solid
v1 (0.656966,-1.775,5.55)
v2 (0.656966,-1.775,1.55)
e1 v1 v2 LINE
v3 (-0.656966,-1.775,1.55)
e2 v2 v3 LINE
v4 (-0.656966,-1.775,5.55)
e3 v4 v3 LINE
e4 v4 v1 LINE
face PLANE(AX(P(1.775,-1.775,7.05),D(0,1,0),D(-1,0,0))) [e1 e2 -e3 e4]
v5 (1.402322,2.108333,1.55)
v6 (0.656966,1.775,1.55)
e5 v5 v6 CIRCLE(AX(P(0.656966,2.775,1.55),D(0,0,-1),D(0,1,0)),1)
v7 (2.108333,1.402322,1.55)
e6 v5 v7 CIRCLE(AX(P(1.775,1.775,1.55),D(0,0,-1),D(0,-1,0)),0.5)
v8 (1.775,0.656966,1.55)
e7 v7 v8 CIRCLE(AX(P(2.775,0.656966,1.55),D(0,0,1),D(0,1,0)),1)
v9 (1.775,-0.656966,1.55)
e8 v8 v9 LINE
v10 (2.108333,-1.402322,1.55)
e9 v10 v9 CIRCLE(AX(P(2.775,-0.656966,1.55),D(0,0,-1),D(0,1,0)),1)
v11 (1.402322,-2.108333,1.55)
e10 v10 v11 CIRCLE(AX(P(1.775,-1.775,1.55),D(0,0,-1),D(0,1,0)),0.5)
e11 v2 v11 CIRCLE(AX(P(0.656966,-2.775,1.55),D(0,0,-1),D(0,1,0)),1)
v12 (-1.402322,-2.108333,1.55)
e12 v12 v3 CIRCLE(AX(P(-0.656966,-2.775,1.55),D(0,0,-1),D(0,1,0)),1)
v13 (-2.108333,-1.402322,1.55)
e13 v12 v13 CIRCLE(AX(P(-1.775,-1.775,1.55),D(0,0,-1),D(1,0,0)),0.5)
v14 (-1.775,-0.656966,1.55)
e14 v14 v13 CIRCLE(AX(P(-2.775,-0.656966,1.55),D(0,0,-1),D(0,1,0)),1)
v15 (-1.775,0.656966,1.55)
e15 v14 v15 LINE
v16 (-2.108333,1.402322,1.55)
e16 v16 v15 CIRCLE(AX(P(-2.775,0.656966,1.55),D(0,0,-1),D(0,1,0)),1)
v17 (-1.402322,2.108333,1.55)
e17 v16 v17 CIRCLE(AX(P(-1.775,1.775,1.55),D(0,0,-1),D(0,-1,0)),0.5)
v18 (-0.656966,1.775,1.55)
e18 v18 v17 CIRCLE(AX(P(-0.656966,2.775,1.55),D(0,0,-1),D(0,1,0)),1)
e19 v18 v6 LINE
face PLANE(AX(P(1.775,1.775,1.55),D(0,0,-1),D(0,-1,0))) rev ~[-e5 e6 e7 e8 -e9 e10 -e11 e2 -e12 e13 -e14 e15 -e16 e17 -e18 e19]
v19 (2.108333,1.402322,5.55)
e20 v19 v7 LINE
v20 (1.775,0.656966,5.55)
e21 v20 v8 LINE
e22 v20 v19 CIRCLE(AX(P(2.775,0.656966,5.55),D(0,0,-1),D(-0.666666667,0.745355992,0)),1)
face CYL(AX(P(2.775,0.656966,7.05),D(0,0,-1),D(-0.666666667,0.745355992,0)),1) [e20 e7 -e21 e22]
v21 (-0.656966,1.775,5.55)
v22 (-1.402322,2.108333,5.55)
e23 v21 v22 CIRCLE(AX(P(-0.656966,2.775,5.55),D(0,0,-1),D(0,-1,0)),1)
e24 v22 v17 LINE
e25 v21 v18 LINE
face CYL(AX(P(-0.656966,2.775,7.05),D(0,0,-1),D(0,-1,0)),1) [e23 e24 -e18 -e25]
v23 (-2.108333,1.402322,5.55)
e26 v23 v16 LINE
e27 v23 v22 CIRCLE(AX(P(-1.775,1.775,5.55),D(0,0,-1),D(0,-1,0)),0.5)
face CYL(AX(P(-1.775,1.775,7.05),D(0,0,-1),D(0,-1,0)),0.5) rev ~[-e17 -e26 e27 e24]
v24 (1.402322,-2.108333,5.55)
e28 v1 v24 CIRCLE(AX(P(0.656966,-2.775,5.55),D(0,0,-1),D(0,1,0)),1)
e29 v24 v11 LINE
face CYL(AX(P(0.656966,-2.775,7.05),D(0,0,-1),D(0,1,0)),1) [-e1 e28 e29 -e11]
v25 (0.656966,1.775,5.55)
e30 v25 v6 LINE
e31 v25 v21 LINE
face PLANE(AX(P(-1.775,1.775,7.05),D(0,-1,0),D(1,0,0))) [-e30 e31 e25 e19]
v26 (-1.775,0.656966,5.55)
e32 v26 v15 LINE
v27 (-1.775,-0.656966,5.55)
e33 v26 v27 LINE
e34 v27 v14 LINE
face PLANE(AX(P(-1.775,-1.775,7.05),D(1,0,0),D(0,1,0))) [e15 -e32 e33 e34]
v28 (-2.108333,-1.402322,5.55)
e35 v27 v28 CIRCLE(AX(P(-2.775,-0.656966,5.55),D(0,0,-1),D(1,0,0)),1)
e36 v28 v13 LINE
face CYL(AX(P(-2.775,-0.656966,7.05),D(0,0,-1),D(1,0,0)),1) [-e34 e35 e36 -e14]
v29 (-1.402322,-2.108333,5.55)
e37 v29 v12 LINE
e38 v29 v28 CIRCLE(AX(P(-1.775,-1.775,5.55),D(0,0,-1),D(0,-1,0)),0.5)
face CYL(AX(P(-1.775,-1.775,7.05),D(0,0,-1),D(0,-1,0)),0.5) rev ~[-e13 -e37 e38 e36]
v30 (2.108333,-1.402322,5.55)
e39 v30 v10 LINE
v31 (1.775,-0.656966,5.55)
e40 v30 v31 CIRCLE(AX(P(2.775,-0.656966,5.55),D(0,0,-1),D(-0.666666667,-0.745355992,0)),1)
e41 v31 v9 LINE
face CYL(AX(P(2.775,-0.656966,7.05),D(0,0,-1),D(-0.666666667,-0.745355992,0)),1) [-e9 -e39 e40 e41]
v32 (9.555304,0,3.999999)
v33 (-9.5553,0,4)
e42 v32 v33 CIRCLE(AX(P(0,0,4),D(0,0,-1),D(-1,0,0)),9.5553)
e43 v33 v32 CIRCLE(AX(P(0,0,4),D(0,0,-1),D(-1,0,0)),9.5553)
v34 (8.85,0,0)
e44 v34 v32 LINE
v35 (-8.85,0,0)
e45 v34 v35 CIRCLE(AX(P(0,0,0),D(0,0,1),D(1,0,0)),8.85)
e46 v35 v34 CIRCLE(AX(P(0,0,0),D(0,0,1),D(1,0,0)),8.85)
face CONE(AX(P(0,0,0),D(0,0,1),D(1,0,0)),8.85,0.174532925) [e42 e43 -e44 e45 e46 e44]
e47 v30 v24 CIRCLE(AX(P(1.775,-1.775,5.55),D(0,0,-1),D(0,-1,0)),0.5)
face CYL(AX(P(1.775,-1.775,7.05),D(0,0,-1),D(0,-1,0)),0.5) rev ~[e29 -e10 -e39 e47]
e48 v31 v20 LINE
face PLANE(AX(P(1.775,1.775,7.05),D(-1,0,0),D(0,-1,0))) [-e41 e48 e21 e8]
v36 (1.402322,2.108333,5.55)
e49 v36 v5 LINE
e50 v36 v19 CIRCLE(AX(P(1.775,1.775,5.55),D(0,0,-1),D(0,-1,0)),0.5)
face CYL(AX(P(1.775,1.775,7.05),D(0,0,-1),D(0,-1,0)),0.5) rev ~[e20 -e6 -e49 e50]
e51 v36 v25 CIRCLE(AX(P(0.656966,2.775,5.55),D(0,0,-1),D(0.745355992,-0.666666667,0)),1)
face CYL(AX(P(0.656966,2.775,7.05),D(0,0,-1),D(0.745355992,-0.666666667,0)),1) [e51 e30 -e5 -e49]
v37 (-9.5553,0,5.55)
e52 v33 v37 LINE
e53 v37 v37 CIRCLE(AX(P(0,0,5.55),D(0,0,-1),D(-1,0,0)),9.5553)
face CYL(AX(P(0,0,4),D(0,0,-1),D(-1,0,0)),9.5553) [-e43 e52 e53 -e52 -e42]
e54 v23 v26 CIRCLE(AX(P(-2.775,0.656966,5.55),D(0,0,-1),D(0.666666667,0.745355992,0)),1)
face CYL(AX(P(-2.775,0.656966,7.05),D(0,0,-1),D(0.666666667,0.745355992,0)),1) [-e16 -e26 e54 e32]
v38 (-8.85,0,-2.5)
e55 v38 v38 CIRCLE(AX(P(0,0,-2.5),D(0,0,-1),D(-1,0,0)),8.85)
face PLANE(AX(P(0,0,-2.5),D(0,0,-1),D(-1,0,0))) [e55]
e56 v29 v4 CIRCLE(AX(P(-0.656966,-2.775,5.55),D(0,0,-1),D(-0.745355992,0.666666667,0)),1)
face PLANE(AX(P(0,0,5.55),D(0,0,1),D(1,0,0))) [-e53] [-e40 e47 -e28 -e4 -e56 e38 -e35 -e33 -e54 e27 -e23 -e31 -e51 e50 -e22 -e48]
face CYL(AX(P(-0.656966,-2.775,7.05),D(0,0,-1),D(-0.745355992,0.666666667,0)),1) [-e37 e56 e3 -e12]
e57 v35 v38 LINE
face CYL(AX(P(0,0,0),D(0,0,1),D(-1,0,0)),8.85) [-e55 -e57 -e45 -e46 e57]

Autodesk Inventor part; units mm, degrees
ref_plane "YZ Plane" through (0, 0, 0) normal (1, 0, 0) x (0, 1, 0)
ref_plane "XZ Plane" through (0, 0, 0) normal (0, 1, 0) x (-1, 0, 0)
sketch "Esquisse1" plane through (0, 0, 0) normal (0, 0, 1) x (1, 0, 0)
  circle A0 centre (0, 0) radius 8.85
  dimension "d0" = 17.7
extrude "Extrusion1" add sketch "Esquisse1" along normal blind 7.05 draft 10
sketch "Esquisse2" plane through (0, 0, 7.05) normal (0, 0, 1) x (1, 0, 0)
  line L0 (1.775, -1.775) -> (-1.775, -1.775)
  line L1 (-1.775, -1.775) -> (-1.775, 1.775)
  line L2 (-1.775, 1.775) -> (1.775, 1.775)
  line L3 (1.775, 1.775) -> (1.775, -1.775)
  line L4 (1.775, -1.775) -> (-1.775, 1.775) construction
  line L5 (-1.775, -1.775) -> (1.775, 1.775) construction
  point P0 (0, 0)
  dimension "d3" = 3.55
  dimension "d4" = 3.55
extrude "Extrusion2" cut sketch "Esquisse2" against normal blind 5.5
ref_plane "Plan de construction1" through (0, 0, 4) normal (0, 0, -1) x (-1, 0, 0)
sketch "Esquisse3" plane through (0, 0, 4) normal (0, 0, -1) x (-1, 0, 0)
  circle A0 centre (0, 0) radius 9.5553 projected
  circle A1 centre (0, 0) radius 13.8909
  line L0 (-1.775, 1.775) -> (-1.775, -1.775) projected
  line L1 (-1.775, -1.775) -> (1.775, -1.775) projected
  line L2 (1.775, -1.775) -> (1.775, 1.775) projected
  line L3 (1.775, 1.775) -> (-1.775, 1.775) projected
extrude "Extrusion3" cut sketch "Esquisse3" against normal through all contours A1
sketch "Esquisse4" plane through (0, 0, 0) normal (0, 0, -1) x (-1, 0, 0)
  circle A0 centre (0, 0) radius 8.85 projected
extrude "Extrusion4" add sketch "Esquisse4" along normal blind 2.5
sketch "Esquisse5" plane through (0, 0, -2.5) normal (0, 0, -1) x (-1, 0, 0)
  line L0 (2.6892, 4.9729) -> (2.6892, -4.9729) construction
  line L1 (2.6892, -4.9729) -> (-2.6892, -4.9729) construction
  line L2 (-2.6892, -4.9729) -> (-2.6892, 4.9729) construction
  line L3 (-2.6892, 4.9729) -> (2.6892, 4.9729) construction
  line L4 (13.3774, 0) -> (-13.3774, 0) projected
  line L5 (0, -13.3774) -> (0, 13.3774) projected
  point P0 (0, 0)
  point P1 (-3.9441, 0)
  point P2 (0, -4.9729)
  point P3 (-2.6892, 0)
  point P4 (0, -4.9729)
extrude "Extrusion5" [suppressed]
sketch "Esquisse6" plane through (0, 0, 7.05) normal (0, 0, 1) x (1, 0, 0)
  line L0 (-1.775, 1.775) -> (1.775, 1.775) projected
  line L1 (1.775, -1.775) -> (-1.775, -1.775) projected
  point P0 (0, 0)
hole "Perçage1" at (-1.775, 1.775, 7.05) at (1.775, 1.775, 7.05) at (-1.775, -1.775, 7.05) at (1.775, -1.775, 7.05) direction (0, 0, -1) diameter 1 depth 5.5
fillet "Congé1" radius 1 8 edges at (-1.275, 1.775, 4.3) (1.275, 1.775, 4.3) (1.775, 1.275, 4.3) (1.775, -1.275, 4.3) (1.275, -1.775, 4.3) (-1.275, -1.775, 4.3) (-1.775, -1.275, 4.3) (-1.775, 1.275, 4.3)
sketch "Esquisse8" plane through (0, 0, 7.05) normal (0, 0, 1) x (1, 0, 0)
  circle A0 centre (0, 0) radius 10
  dimension "d29" = 20
extrude "Extrusion7" cut sketch "Esquisse8" against normal blind 1.5
sketch "Esquisse7" plane through (0, 0, 7.05) normal (0, 0, 1) x (1, 0, 0)
  arc A0 (3.0373, 1.3601) -> (3.0546, -1.3184) centre (5.8249, 0.0388) ccw construction
  arc A1 (2.6759, 1.5314) -> (2.6954, -1.4944) centre (5.8249, 0.0388) ccw
  arc A2 (3.3988, 1.1887) -> (3.4138, -1.1424) centre (5.8249, 0.0388) ccw
  arc A3 (3.3988, 1.1887) -> (2.6759, 1.5314) centre (3.0373, 1.3601) ccw
  arc A4 (2.6954, -1.4944) -> (3.4138, -1.1424) centre (3.0546, -1.3184) ccw
  point P0 (0, 0)
  dimension "d23" = 0.8
equation "\"d3\" = d4"
properties part number "Power_Button"
